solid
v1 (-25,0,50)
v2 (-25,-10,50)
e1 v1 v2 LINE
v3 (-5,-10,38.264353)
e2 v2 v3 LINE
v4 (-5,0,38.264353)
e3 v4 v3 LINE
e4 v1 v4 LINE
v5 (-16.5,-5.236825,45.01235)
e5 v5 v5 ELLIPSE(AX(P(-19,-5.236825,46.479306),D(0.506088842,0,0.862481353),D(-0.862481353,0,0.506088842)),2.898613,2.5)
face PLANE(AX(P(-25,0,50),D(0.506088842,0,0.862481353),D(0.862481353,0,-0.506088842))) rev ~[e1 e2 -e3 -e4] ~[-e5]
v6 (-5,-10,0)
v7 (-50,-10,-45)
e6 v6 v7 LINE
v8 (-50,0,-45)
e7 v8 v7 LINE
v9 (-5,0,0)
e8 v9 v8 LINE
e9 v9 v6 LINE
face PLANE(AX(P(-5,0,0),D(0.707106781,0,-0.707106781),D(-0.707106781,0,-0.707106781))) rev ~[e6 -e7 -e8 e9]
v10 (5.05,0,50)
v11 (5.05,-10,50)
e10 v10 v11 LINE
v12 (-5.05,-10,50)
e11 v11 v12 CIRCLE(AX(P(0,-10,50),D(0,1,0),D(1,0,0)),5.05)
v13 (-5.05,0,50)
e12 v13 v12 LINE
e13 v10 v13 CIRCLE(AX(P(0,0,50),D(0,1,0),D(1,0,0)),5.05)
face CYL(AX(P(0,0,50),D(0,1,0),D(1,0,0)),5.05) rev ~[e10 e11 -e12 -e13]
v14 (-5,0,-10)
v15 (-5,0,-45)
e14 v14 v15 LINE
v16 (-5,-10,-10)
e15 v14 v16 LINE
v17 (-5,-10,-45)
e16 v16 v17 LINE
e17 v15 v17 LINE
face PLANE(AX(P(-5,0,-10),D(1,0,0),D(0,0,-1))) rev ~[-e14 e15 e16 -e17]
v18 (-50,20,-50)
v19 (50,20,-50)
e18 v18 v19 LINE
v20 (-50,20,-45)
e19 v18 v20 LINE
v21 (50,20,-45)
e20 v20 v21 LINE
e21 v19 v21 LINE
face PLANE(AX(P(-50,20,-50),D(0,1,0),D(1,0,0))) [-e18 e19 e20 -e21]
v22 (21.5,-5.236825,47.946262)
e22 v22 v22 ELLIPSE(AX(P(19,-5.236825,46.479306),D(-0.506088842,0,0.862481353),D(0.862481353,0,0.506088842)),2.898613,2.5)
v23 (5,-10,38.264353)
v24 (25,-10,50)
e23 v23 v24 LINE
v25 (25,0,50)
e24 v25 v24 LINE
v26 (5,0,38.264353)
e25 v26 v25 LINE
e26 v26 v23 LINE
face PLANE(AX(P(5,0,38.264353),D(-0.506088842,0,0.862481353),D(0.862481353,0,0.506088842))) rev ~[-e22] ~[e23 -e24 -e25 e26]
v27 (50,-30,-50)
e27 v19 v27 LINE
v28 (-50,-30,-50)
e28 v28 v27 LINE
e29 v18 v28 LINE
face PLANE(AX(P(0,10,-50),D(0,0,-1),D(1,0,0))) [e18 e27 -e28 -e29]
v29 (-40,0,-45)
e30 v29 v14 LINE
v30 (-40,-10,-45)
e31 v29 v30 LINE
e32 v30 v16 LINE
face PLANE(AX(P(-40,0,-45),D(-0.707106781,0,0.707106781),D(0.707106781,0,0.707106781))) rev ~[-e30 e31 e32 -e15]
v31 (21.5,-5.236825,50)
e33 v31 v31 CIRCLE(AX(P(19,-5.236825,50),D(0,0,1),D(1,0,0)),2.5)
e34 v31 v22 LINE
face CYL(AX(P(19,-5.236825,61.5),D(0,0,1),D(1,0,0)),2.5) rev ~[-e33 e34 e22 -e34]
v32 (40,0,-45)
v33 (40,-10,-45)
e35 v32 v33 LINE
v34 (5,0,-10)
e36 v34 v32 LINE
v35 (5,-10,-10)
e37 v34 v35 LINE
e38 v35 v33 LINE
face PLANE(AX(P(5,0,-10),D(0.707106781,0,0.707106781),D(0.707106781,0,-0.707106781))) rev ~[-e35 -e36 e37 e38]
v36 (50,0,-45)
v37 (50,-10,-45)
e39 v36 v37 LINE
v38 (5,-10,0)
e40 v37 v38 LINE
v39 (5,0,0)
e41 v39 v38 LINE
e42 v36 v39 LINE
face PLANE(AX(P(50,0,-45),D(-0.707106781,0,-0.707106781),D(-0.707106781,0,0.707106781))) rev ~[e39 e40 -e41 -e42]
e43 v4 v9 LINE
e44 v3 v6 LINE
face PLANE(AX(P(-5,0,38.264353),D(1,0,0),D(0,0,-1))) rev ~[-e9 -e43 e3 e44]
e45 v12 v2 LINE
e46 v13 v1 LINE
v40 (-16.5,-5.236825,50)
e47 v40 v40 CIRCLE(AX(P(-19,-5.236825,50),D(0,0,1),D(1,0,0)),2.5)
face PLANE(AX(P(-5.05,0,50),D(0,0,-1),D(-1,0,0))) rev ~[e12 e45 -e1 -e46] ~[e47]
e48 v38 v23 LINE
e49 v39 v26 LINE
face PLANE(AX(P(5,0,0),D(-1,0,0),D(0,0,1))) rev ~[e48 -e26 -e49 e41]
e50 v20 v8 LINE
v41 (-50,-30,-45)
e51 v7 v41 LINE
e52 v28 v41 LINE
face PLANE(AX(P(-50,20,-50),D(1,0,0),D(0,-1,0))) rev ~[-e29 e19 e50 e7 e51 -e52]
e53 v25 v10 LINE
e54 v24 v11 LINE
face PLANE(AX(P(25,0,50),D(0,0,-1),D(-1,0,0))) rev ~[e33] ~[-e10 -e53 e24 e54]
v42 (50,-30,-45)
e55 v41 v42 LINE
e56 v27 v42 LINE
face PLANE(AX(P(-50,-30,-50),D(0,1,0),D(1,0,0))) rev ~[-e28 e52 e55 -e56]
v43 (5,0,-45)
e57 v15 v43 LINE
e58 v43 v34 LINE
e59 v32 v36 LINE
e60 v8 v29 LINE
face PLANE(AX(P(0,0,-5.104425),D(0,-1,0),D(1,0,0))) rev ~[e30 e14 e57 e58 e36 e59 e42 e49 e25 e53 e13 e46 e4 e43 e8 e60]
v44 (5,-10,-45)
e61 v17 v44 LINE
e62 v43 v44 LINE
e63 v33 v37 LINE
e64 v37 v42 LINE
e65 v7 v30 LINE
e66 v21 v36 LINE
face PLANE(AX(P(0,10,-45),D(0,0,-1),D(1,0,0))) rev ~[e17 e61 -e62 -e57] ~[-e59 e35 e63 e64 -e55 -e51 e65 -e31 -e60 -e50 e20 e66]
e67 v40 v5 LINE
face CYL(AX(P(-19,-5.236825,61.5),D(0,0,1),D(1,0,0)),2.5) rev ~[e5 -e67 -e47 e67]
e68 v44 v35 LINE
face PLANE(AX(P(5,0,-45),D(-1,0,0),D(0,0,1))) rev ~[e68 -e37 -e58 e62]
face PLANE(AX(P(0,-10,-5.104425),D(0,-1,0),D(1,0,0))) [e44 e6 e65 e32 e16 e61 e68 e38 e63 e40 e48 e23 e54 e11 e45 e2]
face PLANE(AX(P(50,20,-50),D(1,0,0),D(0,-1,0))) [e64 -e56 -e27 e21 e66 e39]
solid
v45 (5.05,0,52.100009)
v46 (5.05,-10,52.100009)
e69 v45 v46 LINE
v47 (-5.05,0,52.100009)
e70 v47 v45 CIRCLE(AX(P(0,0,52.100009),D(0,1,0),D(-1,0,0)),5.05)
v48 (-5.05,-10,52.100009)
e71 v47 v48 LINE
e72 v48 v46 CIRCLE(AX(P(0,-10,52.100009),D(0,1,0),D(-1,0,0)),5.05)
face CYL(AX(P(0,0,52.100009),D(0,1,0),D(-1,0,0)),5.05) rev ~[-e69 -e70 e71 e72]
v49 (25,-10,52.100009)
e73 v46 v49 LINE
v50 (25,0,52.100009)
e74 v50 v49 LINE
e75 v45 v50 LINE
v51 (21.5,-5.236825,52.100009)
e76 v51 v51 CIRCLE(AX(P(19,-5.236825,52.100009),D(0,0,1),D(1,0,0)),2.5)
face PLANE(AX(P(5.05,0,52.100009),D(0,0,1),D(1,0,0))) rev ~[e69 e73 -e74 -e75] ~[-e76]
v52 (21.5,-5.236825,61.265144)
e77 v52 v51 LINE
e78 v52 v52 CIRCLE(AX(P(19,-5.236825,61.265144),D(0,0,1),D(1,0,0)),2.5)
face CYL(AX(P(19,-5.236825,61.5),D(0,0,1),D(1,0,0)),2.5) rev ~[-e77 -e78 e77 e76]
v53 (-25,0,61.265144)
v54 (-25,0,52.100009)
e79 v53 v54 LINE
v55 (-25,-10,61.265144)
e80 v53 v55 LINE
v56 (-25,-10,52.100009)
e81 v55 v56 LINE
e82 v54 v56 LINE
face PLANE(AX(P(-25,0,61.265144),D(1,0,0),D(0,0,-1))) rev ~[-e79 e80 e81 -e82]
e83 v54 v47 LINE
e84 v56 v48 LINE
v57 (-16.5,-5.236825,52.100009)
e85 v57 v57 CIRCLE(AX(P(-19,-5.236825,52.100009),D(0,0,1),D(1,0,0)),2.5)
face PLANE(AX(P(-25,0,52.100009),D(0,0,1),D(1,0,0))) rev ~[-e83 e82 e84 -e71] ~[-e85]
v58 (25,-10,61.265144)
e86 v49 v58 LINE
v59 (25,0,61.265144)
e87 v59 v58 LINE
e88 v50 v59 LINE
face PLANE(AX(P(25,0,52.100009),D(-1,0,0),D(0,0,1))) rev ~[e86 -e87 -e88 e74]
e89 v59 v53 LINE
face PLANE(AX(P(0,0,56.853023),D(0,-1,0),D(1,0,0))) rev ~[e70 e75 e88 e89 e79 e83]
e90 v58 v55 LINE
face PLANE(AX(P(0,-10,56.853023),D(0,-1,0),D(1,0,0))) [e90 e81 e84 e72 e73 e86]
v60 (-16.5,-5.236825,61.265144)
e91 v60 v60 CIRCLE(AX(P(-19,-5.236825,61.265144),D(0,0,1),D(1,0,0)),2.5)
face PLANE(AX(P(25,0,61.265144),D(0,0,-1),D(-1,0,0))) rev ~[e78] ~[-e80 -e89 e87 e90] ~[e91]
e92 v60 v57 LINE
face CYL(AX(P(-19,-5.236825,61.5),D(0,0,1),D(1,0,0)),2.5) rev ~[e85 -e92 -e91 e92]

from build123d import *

# Parameters (mm, degrees)
F1_DEPTH = 10
F3_R     = 2.5
F4_DEPTH = 25
F5_W     = 100
F5_H     = 20
F6_DEPTH = 5


# Not quite as in the source:
# - a feature names something its author has since deleted; it is built from what else it names


with BuildPart() as f1:
    # F0 (on Front) → F1 (new body)
    with BuildSketch(Plane.XZ):
        with BuildLine():
            Line((-5.05, 50), (-25, 50))
            Line((-25, 50), (-5, 38.2643528283))
            Line((-5, 38.2643528283), (-5, 0))
            Line((-5, 0), (-50, -45))
            Line((-50, -45), (-50, -50))
            Line((-50, -50), (50, -50))
            Line((50, -50), (50, -45))
            Line((50, -45), (5, 0))
            Line((5, 0), (5, 38.2643528283))
            Line((5, 38.2643528283), (25, 50))
            Line((25, 50), (5.05, 50))
            ThreePointArc((5.05, 50), (0, 44.95), (-5.05, 50))
        make_face()
        Polygon((-5, -45), (-40, -45), (-5, -10), align=None, mode=Mode.SUBTRACT)
        Polygon((5, -10), (40, -45), (5, -45), align=None, mode=Mode.SUBTRACT)
    extrude(amount=F1_DEPTH)


with BuildPart() as f1b:
    # F0 (on Front) → F1, piece 2 (new body)
    with BuildSketch(Plane.XZ):
        with BuildLine():
            Line((5.05, 52.1000094712), (25, 52.1000094712))
            Line((25, 52.1000094712), (25, 61.2651444972))
            Line((25, 61.2651444972), (-25, 61.2651444972))
            Line((-25, 61.2651444972), (-25, 52.1000094712))
            Line((-25, 52.1000094712), (-5.05, 52.1000094712))
            ThreePointArc((-5.05, 52.1000094712), (0, 57.1500094712), (5.05, 52.1000094712))
        make_face()
    extrude(amount=F1_DEPTH)


with BuildPart() as f4_tool:
    # F3 (on offset) → F4 (new body)
    with BuildSketch(Plane.XY.offset(61.5)):
        with Locations((-19, -5.2368245088)):
            Circle(F3_R)
        with Locations((19, -5.2368245088)):
            Circle(F3_R)
    extrude(amount=-F4_DEPTH)


with BuildPart() as f1_1:
    add(f1.part)

    # F4: cut by f4_tool
    add(f4_tool.part, mode=Mode.SUBTRACT)

    # F5 (on face) → F6 (join)
    with BuildSketch(Plane(origin=(0, 0, -50), x_dir=(1, 0, 0), z_dir=(0, 0, -1))):
        with Locations((0, -10)):
            Rectangle(F5_W, F5_H)
        with Locations((0, 20)):
            Rectangle(F5_W, F5_H)
    extrude(amount=-F6_DEPTH)


with BuildPart() as f1b_1:
    add(f1b.part)

    # F4: cut by f4_tool
    add(f4_tool.part, mode=Mode.SUBTRACT)


solid = Compound([f1_1.part, f1b_1.part])
